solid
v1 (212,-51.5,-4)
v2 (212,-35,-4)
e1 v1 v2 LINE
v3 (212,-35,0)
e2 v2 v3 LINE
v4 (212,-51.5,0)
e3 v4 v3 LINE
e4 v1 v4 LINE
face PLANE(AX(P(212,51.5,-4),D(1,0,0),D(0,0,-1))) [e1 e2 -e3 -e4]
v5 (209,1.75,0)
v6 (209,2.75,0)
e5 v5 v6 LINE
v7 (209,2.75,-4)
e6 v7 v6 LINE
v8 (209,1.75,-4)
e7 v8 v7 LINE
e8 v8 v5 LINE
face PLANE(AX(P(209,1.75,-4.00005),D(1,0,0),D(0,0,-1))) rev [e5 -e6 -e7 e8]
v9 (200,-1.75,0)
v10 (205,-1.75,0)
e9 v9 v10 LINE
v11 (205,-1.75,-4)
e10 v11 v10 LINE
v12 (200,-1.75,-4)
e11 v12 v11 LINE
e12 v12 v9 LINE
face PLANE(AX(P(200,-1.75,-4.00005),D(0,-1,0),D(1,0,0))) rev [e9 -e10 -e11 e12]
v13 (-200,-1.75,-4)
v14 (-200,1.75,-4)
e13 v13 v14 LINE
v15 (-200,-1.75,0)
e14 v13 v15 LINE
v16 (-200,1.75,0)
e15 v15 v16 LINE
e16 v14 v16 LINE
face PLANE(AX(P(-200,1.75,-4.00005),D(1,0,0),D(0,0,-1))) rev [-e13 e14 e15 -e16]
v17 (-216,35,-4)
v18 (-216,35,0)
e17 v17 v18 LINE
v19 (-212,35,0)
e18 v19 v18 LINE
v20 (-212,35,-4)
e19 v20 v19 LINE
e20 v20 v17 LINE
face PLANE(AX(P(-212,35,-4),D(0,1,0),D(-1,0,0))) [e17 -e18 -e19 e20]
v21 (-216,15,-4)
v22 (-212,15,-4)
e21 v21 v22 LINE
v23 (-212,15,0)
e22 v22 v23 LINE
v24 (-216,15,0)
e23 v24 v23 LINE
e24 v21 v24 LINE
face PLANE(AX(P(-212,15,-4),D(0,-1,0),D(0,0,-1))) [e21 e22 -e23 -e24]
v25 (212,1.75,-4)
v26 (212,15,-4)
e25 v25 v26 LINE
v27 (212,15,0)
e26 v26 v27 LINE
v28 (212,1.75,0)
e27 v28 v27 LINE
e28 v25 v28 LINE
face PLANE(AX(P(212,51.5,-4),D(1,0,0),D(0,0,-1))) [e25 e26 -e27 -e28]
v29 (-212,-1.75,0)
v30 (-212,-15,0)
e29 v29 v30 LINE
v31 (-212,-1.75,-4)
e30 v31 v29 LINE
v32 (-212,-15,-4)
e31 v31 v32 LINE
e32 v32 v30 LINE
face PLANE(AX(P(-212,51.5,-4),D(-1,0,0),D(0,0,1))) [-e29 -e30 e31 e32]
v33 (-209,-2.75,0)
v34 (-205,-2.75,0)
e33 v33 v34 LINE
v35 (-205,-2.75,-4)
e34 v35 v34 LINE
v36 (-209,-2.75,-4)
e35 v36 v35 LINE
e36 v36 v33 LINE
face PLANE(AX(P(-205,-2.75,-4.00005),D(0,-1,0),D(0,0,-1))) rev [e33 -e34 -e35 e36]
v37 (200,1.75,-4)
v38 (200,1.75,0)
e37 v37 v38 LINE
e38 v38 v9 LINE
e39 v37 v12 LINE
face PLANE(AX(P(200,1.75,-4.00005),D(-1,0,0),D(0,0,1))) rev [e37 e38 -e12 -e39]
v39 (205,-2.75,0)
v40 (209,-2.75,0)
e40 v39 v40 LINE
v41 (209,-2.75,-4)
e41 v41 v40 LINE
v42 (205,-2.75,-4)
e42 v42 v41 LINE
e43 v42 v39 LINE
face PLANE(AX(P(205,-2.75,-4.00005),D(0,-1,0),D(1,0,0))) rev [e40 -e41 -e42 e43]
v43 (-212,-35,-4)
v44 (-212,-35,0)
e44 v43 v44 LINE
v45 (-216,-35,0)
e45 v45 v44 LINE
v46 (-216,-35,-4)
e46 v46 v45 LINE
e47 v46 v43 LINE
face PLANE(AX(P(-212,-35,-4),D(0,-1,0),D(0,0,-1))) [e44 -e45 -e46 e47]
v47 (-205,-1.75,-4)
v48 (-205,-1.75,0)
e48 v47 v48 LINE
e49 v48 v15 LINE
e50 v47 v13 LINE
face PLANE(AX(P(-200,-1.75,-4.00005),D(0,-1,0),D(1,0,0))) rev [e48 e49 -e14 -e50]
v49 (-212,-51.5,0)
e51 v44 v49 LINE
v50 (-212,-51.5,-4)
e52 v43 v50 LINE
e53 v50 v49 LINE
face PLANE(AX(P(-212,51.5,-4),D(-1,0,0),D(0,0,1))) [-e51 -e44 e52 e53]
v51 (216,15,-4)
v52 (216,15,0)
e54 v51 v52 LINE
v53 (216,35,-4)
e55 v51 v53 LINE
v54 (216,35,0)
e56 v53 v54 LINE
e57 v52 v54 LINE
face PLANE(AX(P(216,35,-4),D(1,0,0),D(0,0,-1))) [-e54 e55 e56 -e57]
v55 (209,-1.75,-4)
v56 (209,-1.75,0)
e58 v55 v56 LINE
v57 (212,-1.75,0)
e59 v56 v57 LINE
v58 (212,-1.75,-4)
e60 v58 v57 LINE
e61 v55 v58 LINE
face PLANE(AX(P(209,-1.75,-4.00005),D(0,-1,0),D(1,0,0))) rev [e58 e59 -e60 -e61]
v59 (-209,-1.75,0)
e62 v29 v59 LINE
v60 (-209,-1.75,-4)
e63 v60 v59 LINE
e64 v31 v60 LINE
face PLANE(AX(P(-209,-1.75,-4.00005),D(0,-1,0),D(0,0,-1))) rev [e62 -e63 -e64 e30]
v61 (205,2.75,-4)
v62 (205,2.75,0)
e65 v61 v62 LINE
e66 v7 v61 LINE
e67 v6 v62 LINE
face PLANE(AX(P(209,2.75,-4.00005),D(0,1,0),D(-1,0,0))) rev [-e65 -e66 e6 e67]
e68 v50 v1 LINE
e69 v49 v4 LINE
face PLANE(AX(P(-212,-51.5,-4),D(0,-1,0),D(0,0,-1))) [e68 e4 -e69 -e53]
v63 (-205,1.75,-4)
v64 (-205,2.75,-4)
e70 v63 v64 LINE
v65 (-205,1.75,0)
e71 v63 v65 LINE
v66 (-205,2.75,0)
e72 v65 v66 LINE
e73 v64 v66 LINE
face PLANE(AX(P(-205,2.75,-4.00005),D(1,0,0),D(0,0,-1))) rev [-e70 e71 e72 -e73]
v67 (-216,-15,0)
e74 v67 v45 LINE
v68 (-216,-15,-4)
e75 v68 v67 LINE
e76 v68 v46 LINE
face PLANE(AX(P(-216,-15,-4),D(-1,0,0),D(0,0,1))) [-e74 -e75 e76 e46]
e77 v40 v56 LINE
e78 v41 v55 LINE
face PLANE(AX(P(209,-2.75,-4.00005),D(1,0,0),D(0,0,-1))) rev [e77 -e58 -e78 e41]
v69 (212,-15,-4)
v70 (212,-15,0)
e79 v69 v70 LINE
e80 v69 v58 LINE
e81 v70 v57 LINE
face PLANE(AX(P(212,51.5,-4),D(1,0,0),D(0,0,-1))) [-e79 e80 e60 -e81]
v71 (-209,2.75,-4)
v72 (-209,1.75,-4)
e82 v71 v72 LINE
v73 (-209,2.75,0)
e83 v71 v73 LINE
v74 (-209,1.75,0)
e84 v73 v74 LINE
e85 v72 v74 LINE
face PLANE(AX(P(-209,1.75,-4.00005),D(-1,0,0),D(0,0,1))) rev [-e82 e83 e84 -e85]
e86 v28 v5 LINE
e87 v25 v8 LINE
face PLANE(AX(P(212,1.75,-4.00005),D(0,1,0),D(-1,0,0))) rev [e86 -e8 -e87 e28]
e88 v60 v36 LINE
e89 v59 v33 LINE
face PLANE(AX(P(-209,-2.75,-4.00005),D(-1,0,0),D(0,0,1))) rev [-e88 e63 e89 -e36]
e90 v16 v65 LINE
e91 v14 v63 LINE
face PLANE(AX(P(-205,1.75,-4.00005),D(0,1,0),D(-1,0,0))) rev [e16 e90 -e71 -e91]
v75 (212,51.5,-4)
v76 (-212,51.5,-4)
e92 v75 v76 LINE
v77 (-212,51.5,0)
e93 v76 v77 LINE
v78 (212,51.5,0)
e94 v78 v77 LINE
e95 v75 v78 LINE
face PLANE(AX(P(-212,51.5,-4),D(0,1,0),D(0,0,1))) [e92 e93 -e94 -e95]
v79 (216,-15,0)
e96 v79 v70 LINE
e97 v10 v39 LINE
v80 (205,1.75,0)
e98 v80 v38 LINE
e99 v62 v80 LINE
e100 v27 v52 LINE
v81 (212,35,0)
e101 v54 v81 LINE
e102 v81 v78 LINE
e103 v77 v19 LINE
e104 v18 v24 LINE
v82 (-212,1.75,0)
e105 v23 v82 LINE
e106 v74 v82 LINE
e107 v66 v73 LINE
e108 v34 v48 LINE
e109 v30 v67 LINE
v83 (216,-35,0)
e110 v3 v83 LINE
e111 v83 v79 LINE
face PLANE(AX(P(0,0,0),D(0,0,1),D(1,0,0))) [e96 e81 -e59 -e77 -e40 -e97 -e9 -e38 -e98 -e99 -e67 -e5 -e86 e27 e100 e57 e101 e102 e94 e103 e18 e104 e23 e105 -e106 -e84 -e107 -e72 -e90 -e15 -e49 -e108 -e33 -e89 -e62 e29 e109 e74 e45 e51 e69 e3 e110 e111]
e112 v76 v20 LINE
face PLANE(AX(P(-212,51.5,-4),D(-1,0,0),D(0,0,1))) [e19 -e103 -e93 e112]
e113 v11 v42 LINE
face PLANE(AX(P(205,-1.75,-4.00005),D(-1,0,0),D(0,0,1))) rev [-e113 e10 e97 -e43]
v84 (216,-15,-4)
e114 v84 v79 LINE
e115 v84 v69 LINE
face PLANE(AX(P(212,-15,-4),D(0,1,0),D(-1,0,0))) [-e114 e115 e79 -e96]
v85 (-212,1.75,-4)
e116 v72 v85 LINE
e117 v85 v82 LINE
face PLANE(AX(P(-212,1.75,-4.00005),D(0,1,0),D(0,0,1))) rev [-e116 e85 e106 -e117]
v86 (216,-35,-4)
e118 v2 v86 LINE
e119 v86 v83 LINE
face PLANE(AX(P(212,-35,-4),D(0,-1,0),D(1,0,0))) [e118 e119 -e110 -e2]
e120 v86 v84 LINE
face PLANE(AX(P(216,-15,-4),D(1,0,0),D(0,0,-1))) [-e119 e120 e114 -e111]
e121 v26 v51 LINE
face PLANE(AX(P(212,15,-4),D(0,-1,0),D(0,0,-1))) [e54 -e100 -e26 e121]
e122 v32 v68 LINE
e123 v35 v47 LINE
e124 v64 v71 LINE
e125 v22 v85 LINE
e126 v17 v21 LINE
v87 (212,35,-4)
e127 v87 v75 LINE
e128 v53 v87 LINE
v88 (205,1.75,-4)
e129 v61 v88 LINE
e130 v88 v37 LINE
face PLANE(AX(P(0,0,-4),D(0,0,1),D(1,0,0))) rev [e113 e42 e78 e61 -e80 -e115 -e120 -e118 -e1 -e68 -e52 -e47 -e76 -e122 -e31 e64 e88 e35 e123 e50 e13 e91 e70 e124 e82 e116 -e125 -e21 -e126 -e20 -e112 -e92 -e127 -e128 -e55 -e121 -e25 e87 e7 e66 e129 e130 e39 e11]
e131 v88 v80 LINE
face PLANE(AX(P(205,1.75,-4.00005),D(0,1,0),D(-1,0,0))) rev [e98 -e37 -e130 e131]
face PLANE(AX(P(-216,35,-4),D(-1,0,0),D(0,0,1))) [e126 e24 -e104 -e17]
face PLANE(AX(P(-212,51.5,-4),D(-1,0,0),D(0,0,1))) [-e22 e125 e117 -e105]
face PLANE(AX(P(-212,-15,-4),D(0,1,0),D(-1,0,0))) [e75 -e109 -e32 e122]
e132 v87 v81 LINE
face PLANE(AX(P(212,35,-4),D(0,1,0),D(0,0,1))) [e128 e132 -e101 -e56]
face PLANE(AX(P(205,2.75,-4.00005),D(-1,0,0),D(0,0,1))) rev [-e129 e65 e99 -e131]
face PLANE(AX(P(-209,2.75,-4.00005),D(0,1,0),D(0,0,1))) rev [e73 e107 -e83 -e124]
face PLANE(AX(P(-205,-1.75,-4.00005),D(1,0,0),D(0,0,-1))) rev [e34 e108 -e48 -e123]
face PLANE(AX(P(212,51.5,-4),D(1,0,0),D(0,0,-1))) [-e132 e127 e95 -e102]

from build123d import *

# Parameters (mm, degrees)
SKETCH1_W          = 424
SKETCH1_H          = 103
BASE_FLANGE1_DEPTH = 4
SKETCH4_W          = 4
SKETCH4_H          = 20
TAB1_DEPTH         = 4
CUT_EXTRUDE1_DEPTH = 223.090634652


# Sheet-metal steps are written as plain solids
with BuildPart() as part:
    # Sketch1 → Base-Flange1 (new body)
    with BuildSketch(Plane.XY):
        Rectangle(SKETCH1_W, SKETCH1_H)
    extrude(amount=-BASE_FLANGE1_DEPTH)

    # Sketch4 → Tab1 (add)
    with BuildSketch(Plane.XY):
        with Locations((-214, 25)):
            Rectangle(SKETCH4_W, SKETCH4_H)
        with Locations((-214, -25)):
            Rectangle(SKETCH4_W, SKETCH4_H)
        with Locations((214, 25)):
            Rectangle(SKETCH4_W, SKETCH4_H)
        with Locations((214, -25)):
            Rectangle(SKETCH4_W, SKETCH4_H)
    extrude(amount=-TAB1_DEPTH)

    # Sketch5 → Cut-Extrude1 (cut, through all)
    with BuildSketch(Plane.XY):
        Polygon((-212, 1.75), (-209, 1.75), (-209, 2.75), (-205, 2.75), (-205, 1.75), (-200, 1.75), (-200, -1.75), (-205, -1.75), (-205, -2.75), (-209, -2.75), (-209, -1.75), (-212, -1.75), align=None)
        Polygon((212, -1.75), (212, 1.75), (209, 1.75), (209, 2.75), (205, 2.75), (205, 1.75), (200, 1.75), (200, -1.75), (205, -1.75), (205, -2.75), (209, -2.75), (209, -1.75), align=None)
    extrude(amount=-CUT_EXTRUDE1_DEPTH, mode=Mode.SUBTRACT)


solid = part.part
